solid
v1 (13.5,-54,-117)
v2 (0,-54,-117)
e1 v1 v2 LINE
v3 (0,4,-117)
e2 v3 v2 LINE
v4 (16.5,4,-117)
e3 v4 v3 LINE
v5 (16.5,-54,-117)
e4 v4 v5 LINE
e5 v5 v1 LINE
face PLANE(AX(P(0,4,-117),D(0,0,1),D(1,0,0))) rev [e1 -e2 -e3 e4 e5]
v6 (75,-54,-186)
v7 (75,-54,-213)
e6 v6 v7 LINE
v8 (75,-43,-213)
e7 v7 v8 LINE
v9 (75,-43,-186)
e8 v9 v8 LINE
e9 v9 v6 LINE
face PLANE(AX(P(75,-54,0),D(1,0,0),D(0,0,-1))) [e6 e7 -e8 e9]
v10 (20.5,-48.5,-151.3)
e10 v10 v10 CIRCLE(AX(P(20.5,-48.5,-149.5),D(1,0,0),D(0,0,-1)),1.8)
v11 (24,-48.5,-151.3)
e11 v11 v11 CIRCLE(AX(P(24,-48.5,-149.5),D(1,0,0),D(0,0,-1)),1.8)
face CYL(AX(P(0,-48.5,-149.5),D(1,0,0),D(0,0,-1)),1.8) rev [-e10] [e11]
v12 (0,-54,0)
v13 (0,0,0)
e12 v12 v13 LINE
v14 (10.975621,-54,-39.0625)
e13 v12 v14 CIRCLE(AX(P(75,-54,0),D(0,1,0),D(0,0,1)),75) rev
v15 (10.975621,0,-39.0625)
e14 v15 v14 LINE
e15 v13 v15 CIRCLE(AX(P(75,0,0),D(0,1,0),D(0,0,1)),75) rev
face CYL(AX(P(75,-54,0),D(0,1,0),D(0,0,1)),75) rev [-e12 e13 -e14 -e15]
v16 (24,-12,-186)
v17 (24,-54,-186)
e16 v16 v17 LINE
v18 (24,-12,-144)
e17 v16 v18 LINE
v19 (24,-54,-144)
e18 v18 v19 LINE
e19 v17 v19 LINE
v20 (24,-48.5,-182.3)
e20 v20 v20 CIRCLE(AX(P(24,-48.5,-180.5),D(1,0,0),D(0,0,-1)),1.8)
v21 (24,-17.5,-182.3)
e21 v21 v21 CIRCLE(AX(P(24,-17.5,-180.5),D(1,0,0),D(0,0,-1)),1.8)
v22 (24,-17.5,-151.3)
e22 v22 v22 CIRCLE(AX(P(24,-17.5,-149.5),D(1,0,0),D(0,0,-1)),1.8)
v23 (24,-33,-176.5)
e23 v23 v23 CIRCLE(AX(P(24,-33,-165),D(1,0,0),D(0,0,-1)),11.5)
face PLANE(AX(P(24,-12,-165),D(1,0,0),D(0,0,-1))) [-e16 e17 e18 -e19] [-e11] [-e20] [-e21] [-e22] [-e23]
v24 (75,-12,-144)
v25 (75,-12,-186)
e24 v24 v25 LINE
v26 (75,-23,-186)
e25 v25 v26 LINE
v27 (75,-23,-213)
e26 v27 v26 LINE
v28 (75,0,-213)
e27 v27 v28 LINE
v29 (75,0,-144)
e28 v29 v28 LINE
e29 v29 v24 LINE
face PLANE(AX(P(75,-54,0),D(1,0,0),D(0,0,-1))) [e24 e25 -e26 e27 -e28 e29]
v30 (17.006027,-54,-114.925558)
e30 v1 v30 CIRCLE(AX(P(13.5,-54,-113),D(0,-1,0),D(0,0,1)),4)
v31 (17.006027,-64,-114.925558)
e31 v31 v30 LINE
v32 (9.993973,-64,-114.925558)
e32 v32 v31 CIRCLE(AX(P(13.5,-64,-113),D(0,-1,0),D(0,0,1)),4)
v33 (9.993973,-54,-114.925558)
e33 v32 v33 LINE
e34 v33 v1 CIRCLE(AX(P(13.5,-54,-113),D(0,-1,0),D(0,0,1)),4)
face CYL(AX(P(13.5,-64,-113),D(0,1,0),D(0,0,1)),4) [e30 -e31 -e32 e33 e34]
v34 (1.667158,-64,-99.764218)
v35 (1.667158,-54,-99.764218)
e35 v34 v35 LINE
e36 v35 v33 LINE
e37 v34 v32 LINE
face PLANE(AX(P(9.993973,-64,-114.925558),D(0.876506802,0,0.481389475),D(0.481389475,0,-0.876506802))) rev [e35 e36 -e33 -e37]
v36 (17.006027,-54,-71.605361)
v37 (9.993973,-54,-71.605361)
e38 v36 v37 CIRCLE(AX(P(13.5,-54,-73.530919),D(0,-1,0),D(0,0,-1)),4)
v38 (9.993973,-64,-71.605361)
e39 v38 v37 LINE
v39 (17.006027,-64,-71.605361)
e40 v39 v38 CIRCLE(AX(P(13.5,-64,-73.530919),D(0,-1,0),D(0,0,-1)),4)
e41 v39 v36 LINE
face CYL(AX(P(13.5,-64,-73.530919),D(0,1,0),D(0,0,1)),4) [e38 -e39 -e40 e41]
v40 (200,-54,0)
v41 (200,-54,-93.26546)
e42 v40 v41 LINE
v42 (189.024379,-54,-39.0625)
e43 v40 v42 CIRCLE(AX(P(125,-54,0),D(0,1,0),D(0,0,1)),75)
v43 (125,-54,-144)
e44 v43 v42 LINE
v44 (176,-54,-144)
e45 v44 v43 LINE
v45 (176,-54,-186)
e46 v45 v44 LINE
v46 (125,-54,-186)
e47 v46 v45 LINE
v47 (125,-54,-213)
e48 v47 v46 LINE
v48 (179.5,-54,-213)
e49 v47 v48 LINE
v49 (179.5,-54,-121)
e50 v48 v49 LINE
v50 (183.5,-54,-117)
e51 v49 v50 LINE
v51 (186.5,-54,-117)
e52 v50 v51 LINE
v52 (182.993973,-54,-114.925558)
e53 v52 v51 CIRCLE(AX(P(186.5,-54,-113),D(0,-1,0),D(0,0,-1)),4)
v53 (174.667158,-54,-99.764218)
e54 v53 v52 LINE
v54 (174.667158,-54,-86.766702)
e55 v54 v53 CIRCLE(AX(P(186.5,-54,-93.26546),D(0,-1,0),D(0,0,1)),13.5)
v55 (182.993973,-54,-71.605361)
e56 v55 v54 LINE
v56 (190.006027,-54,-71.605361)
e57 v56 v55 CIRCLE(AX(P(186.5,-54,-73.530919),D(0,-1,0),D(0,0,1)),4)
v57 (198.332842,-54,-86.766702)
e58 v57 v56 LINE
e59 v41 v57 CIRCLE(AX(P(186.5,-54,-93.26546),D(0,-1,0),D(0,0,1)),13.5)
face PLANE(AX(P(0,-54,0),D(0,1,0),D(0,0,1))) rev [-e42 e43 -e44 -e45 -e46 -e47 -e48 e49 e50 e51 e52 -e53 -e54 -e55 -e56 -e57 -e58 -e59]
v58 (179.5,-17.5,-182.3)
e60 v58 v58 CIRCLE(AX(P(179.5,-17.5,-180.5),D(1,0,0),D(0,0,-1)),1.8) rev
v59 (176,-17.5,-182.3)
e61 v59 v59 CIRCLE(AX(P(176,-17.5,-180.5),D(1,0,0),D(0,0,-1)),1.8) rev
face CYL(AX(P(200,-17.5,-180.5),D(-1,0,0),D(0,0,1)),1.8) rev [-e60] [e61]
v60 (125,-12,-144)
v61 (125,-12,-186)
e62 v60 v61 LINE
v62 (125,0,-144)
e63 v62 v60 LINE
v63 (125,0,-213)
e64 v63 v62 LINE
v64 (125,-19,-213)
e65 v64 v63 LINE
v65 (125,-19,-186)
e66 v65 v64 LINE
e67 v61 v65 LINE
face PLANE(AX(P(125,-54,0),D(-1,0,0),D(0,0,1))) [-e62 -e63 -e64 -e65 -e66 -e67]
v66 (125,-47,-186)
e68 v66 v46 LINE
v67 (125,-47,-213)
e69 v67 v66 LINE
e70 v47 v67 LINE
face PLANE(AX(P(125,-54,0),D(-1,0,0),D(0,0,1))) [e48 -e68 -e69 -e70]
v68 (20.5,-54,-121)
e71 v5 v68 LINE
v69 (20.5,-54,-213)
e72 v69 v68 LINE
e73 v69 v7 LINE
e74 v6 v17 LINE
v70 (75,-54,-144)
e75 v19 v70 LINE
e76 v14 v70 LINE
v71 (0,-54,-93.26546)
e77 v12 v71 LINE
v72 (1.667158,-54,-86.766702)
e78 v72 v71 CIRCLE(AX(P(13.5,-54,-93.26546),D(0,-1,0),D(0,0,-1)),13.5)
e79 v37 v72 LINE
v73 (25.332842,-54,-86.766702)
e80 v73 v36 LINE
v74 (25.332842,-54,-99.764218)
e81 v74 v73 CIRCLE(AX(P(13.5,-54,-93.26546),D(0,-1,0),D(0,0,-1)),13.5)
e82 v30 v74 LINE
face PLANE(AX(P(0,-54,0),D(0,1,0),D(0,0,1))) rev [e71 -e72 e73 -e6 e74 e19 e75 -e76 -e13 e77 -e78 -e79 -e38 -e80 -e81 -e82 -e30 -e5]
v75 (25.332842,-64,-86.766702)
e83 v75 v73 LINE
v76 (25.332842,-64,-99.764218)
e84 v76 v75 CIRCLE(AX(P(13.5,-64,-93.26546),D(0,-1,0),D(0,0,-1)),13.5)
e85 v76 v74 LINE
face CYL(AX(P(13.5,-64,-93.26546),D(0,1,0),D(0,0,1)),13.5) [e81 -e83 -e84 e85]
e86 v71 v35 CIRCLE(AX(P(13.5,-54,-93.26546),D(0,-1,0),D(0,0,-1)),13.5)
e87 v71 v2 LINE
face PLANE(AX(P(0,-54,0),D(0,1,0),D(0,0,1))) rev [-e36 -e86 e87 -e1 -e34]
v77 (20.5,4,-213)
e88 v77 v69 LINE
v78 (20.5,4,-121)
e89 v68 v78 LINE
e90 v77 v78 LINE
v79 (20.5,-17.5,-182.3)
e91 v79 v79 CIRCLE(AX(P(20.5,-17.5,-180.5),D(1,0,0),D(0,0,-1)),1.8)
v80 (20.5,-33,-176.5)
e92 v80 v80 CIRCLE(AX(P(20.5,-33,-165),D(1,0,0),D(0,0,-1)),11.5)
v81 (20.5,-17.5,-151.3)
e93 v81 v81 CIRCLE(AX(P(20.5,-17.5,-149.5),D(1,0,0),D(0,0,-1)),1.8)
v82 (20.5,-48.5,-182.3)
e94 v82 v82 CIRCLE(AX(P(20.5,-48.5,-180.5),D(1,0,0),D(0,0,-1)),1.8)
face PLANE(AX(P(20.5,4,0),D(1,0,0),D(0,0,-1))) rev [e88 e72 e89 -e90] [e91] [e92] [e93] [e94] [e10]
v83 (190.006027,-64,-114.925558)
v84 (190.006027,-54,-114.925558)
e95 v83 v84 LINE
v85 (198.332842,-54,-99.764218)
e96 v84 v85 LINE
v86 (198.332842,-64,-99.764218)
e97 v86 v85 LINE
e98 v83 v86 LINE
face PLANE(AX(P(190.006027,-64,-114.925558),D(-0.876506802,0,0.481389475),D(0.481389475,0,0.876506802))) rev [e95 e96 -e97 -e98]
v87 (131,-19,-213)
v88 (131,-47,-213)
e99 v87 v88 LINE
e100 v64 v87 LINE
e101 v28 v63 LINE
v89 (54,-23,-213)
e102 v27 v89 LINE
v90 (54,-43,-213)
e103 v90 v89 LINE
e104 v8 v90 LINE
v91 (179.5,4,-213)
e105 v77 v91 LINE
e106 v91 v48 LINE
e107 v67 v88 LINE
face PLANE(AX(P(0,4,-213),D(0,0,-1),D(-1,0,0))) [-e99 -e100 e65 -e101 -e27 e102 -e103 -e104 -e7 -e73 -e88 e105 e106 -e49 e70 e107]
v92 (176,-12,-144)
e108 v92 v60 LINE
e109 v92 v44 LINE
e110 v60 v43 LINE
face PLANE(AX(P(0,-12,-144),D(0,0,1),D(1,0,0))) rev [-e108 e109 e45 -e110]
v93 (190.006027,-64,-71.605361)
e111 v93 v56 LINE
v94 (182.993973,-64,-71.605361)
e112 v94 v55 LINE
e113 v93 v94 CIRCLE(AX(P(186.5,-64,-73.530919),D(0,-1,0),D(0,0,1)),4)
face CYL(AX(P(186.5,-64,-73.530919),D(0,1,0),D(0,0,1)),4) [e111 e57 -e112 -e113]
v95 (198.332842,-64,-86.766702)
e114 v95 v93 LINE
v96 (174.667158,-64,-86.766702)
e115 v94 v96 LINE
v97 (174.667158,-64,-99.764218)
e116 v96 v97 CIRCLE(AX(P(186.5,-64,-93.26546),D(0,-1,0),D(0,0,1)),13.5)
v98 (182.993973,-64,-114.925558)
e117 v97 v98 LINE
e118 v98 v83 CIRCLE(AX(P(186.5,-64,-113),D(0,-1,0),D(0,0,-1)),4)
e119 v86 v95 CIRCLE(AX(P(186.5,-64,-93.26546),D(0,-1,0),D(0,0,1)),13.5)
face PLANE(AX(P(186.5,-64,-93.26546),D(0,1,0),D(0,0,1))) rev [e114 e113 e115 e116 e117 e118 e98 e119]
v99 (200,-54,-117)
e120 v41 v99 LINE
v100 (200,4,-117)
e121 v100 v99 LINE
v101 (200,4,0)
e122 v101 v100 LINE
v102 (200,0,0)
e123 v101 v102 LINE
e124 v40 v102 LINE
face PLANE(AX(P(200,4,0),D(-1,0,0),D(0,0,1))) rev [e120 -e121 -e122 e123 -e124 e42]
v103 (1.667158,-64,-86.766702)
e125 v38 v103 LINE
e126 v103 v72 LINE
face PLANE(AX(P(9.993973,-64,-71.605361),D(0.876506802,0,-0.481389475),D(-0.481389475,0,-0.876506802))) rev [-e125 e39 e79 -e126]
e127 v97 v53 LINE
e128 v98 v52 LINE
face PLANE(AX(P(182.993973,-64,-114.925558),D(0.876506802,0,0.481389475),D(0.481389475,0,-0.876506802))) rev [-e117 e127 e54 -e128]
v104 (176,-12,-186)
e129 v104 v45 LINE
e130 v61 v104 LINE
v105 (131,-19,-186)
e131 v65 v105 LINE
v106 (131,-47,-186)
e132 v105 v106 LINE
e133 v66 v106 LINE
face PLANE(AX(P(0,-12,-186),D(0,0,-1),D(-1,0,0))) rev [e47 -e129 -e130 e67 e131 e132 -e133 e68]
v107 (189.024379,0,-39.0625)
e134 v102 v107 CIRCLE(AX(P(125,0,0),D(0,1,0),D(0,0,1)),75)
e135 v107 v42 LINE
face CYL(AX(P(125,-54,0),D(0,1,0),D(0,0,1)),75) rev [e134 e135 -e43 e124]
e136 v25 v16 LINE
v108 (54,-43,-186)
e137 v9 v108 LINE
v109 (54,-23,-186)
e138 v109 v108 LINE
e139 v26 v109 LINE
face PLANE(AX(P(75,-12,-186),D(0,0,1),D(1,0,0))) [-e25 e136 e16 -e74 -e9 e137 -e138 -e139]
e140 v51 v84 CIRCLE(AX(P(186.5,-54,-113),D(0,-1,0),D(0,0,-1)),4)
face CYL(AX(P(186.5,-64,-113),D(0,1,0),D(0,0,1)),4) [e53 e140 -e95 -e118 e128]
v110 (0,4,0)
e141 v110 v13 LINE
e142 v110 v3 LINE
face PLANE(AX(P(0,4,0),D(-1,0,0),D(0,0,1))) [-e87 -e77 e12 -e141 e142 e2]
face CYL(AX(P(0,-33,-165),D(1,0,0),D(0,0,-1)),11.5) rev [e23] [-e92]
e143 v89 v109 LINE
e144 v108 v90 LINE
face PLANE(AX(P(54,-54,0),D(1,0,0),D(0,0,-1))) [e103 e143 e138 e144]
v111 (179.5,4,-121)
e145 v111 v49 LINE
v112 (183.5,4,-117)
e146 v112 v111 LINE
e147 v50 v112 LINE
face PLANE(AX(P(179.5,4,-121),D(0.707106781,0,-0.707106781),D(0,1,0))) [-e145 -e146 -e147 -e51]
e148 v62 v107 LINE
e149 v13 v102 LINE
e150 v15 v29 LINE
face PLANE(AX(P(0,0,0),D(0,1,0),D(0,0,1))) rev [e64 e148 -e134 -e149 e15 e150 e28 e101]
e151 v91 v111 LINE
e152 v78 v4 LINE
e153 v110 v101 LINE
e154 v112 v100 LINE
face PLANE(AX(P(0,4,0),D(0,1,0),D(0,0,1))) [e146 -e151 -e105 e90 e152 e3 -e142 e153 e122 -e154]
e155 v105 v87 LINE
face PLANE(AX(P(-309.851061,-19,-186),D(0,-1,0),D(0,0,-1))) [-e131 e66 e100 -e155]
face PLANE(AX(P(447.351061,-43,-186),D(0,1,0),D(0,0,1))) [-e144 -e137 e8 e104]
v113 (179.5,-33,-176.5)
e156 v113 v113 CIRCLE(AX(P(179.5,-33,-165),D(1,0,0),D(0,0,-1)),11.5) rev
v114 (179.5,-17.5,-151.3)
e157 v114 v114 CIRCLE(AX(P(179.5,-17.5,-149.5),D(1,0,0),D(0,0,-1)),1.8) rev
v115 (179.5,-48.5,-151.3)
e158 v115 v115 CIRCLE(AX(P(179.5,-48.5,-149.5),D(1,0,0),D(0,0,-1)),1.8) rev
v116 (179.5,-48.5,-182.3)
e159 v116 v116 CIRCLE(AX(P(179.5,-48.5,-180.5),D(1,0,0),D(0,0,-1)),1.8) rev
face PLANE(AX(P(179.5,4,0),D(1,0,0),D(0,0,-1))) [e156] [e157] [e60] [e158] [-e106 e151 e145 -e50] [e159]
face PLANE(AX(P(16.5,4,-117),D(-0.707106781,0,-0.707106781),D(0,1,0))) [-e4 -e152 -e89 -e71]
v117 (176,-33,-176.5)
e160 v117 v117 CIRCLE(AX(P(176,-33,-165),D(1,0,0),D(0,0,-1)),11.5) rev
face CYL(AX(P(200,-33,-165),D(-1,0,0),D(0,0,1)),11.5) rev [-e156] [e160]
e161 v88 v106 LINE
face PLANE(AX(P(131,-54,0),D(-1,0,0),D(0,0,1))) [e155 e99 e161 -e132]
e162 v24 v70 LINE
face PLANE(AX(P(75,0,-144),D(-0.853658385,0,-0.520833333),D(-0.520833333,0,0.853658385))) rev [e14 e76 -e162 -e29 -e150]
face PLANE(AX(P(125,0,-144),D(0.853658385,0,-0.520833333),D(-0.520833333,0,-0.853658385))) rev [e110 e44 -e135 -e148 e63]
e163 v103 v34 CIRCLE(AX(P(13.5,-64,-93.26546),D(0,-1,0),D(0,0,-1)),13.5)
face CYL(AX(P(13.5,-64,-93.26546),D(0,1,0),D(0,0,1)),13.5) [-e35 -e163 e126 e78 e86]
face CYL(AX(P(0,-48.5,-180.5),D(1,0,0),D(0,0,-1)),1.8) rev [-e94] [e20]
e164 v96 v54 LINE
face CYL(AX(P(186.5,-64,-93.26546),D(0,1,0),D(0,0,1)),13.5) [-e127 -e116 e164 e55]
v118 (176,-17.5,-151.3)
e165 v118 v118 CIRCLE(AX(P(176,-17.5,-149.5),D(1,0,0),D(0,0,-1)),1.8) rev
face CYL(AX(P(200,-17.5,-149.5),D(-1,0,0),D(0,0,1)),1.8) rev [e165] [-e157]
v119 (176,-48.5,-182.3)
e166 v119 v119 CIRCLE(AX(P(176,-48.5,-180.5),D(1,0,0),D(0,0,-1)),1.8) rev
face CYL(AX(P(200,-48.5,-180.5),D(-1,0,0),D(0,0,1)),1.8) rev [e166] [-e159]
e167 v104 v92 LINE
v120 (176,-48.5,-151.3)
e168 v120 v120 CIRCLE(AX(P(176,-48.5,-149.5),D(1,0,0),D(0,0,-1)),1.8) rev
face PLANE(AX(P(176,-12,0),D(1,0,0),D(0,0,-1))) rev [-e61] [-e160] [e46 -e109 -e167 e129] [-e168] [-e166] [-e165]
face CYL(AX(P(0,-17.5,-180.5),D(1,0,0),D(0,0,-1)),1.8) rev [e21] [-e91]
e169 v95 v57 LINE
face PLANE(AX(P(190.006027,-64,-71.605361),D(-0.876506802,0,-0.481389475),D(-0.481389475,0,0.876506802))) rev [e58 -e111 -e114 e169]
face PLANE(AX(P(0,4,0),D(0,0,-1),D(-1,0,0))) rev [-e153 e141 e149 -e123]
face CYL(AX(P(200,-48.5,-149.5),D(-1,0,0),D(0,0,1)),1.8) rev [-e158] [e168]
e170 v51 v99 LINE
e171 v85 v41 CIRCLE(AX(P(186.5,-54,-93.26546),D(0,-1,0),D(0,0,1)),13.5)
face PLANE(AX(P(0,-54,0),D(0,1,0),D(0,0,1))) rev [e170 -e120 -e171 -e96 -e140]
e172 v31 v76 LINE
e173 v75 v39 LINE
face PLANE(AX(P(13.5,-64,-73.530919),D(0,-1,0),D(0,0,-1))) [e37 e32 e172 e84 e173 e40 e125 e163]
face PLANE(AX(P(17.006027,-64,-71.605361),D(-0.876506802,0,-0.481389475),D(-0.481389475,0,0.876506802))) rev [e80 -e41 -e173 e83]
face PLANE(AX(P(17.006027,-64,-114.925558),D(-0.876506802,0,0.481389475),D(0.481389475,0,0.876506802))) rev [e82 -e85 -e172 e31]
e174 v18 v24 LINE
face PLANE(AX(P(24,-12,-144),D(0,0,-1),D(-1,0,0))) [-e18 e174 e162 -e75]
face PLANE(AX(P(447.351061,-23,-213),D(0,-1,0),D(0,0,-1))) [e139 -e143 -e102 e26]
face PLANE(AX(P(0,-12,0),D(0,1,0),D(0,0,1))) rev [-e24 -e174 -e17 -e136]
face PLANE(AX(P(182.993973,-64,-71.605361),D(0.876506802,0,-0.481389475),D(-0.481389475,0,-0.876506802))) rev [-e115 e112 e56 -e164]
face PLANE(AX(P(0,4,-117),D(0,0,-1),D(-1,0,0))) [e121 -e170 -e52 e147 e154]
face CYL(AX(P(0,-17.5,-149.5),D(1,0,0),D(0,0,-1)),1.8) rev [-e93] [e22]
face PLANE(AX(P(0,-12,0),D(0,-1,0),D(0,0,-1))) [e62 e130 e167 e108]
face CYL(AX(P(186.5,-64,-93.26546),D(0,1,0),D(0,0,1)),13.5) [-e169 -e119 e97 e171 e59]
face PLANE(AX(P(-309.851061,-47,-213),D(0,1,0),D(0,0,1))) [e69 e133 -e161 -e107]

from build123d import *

# Parameters (mm, degrees)
SKETCH_1_W              = 200
SKETCH_1_H              = 213
EXTRUDE_1_DEPTH         = 4
EXTRUDE_2_DEPTH         = 54
CUT_EXTRUDE_2_DEPTH     = 298.880848663
CUT_EXTRUDE_3_DEPTH     = 42
SKETCH_7_R              = 1.8
SKETCH_7_R_2            = 11.5
CUT_EXTRUDE_4_DEPTH     = 282.53330176
MIRROR_START            = 176
MIRROR_1_OUTLINE_R      = 1.8
MIRROR_1_OUTLINE_R_2    = 11.5
MIRROR_1_DEPTH          = 3.5
CUT_EXTRUDE_START       = -21
CUT_EXTRUDE_5_OUTLINE_W = 27
CUT_EXTRUDE_5_OUTLINE_H = 20
CUT_EXTRUDE_5_DEPTH     = 21
CUT_EXTRUDE_START_2     = -6
CUT_EXTRUDE_6_OUTLINE_W = 27
CUT_EXTRUDE_6_OUTLINE_H = 28
CUT_EXTRUDE_6_DEPTH     = 6
CHAMFER_1_SIZE          = 4
CUT_EXTRUDE_START_3     = -54
CUT_EXTRUDE_7_DEPTH     = 54
EXTRUDE_3_DEPTH         = 10


# Read off the part's stored shape, not the designer's step: 镜向1, 切除-拉伸5, 切除-拉伸6
with BuildPart() as part:
    # 草图1 → 凸台-拉伸1 (new body)
    with BuildSketch(Plane(origin=(0, 0, 0), x_dir=(1, 0, 0), z_dir=(0, 1, 0))):
        with Locations((100, 106.5)):
            Rectangle(SKETCH_1_W, SKETCH_1_H)
    extrude(amount=EXTRUDE_1_DEPTH)

    # 草图1<4> → 凸台-拉伸2 (add)
    with BuildSketch(Plane(origin=(0, 0, 0), x_dir=(1, 0, 0), z_dir=(0, 1, 0))):
        with BuildLine():
            Line((0, 213), (0, 0))
            ThreePointArc((0, 0), (21.966991411, 53.033008589), (75, 75))
            Line((75, 75), (75, 213))
            Line((75, 213), (0, 213))
        make_face()
        with BuildLine():
            Line((125, 213), (125, 75))
            ThreePointArc((125, 75), (178.033008589, 53.033008589), (200, 0))
            Line((200, 0), (200, 213))
            Line((200, 213), (125, 213))
        make_face()
    extrude(amount=-EXTRUDE_2_DEPTH)

    # 草图3 → 切除-拉伸2 (cut, through all)
    with BuildSketch(Plane.XZ.offset(54)):
        Polygon((20.5, -186), (20.5, -165), (20.5, -144), (20.5, -117), (0, -117), (0, -213), (20.5, -213), align=None)
        Polygon((179.5, -117), (200, -117), (200, -213), (179.5, -213), (179.5, -165), align=None)
    extrude(amount=-CUT_EXTRUDE_2_DEPTH, mode=Mode.SUBTRACT)

    # 草图5 → 切除-拉伸3 (cut)
    with BuildSketch(Plane.XZ.offset(54)):
        Polygon((176, -165), (176, -144), (125, -144), (125, -186), (176, -186), align=None)
        Polygon((24, -165), (24, -144), (75, -144), (75, -186), (24, -186), align=None)
    extrude(amount=-CUT_EXTRUDE_3_DEPTH, mode=Mode.SUBTRACT)

    # 草图7 → 切除-拉伸4 (cut, through all)
    with BuildSketch(Plane(origin=(24, 0, 0), x_dir=(0, 0, -1), z_dir=(1, 0, 0))):
        with Locations((180.5, -17.5)):
            Circle(SKETCH_7_R)
        with Locations((149.5, -17.5)):
            Circle(SKETCH_7_R)
        with Locations((165, -33)):
            Circle(SKETCH_7_R_2)
        with Locations((180.5, -48.5)):
            Circle(SKETCH_7_R)
        with Locations((149.5, -48.5)):
            Circle(SKETCH_7_R)
    extrude(amount=-CUT_EXTRUDE_4_DEPTH, mode=Mode.SUBTRACT)

    # 镜向1 outline → 镜向1 (cut)
    with BuildSketch(Plane.YZ.offset(MIRROR_START)):
        with Locations((-17.5, -180.5)):
            Circle(MIRROR_1_OUTLINE_R)
        with Locations((-17.5, -149.5)):
            Circle(MIRROR_1_OUTLINE_R)
        with Locations((-33, -165)):
            Circle(MIRROR_1_OUTLINE_R_2)
        with Locations((-48.5, -180.5)):
            Circle(MIRROR_1_OUTLINE_R)
        with Locations((-48.5, -149.5)):
            Circle(MIRROR_1_OUTLINE_R)
    extrude(amount=MIRROR_1_DEPTH, mode=Mode.SUBTRACT)

    # 切除-拉伸5 outline → 切除-拉伸5 (cut)
    with BuildSketch(Plane(origin=(75, 0, 0), x_dir=(0, 0, -1), z_dir=(1, 0, 0)).offset(CUT_EXTRUDE_START)):
        with Locations((199.5, -33)):
            Rectangle(CUT_EXTRUDE_5_OUTLINE_W, CUT_EXTRUDE_5_OUTLINE_H)
    extrude(amount=CUT_EXTRUDE_5_DEPTH, mode=Mode.SUBTRACT)

    # 切除-拉伸6 outline → 切除-拉伸6 (cut)
    with BuildSketch(Plane.ZY.offset(-125).offset(CUT_EXTRUDE_START_2)):
        with Locations((-199.5, -33)):
            Rectangle(CUT_EXTRUDE_6_OUTLINE_W, CUT_EXTRUDE_6_OUTLINE_H)
    extrude(amount=CUT_EXTRUDE_6_DEPTH, mode=Mode.SUBTRACT)

    # 倒角1
    chamfer_1_edges = [part.edges().sort_by_distance(p)[0] for p in [
        (20.5, -25, -117),
        (179.5, -25, -117),
    ]]
    chamfer(chamfer_1_edges, length=CHAMFER_1_SIZE)

    # 草图11 → 切除-拉伸7 (cut)
    with BuildSketch(Plane.XZ.offset(54).offset(CUT_EXTRUDE_START_3)):
        with BuildLine():
            Line((75, -144), (10.975621098, -39.0625))
            ThreePointArc((10.975621098, -39.0625), (38.289562111, -65.401404801), (75, -75))
            Line((75, -75), (75, -144))
        make_face()
        with BuildLine():
            Line((125, -144), (125, -75))
            ThreePointArc((125, -75), (161.710437889, -65.401404801), (189.024378902, -39.0625))
            Line((189.024378902, -39.0625), (125, -144))
        make_face()
    extrude(amount=CUT_EXTRUDE_7_DEPTH, mode=Mode.SUBTRACT)

    # 草图12 → 凸台-拉伸3 (add)
    with BuildSketch(Plane(origin=(0, -54, 0), x_dir=(-1, 0, 0), z_dir=(0, -1, 0))):
        with BuildLine():
            Line((-9.993972793, 71.605361452), (-1.667158175, 86.766701767))
            ThreePointArc((-1.667158175, 86.766701767), (0, 93.265459675), (-1.667158175, 99.764217583))
            Line((-1.667158175, 99.764217583), (-9.993972793, 114.925557899))
            ThreePointArc((-9.993972793, 114.925557899), (-13.5, 117), (-17.006027207, 114.925557899))
            Line((-17.006027207, 114.925557899), (-25.332841825, 99.764217583))
            ThreePointArc((-25.332841825, 99.764217583), (-27, 93.265459675), (-25.332841825, 86.766701767))
            Line((-25.332841825, 86.766701767), (-17.006027207, 71.605361452))
            ThreePointArc((-17.006027207, 71.605361452), (-13.5, 69.53091935), (-9.993972793, 71.605361452))
        make_face()
        with BuildLine():
            Line((-190.006027207, 114.925557899), (-198.332841825, 99.764217583))
            ThreePointArc((-198.332841825, 99.764217583), (-200, 93.265459675), (-198.332841825, 86.766701767))
            Line((-198.332841825, 86.766701767), (-190.006027207, 71.605361452))
            ThreePointArc((-190.006027207, 71.605361452), (-186.5, 69.53091935), (-182.993972793, 71.605361452))
            Line((-182.993972793, 71.605361452), (-174.667158175, 86.766701767))
            ThreePointArc((-174.667158175, 86.766701767), (-173, 93.265459675), (-174.667158175, 99.764217583))
            Line((-174.667158175, 99.764217583), (-182.993972793, 114.925557899))
            ThreePointArc((-182.993972793, 114.925557899), (-186.5, 117), (-190.006027207, 114.925557899))
        make_face()
    extrude(amount=EXTRUDE_3_DEPTH)


solid = part.part
